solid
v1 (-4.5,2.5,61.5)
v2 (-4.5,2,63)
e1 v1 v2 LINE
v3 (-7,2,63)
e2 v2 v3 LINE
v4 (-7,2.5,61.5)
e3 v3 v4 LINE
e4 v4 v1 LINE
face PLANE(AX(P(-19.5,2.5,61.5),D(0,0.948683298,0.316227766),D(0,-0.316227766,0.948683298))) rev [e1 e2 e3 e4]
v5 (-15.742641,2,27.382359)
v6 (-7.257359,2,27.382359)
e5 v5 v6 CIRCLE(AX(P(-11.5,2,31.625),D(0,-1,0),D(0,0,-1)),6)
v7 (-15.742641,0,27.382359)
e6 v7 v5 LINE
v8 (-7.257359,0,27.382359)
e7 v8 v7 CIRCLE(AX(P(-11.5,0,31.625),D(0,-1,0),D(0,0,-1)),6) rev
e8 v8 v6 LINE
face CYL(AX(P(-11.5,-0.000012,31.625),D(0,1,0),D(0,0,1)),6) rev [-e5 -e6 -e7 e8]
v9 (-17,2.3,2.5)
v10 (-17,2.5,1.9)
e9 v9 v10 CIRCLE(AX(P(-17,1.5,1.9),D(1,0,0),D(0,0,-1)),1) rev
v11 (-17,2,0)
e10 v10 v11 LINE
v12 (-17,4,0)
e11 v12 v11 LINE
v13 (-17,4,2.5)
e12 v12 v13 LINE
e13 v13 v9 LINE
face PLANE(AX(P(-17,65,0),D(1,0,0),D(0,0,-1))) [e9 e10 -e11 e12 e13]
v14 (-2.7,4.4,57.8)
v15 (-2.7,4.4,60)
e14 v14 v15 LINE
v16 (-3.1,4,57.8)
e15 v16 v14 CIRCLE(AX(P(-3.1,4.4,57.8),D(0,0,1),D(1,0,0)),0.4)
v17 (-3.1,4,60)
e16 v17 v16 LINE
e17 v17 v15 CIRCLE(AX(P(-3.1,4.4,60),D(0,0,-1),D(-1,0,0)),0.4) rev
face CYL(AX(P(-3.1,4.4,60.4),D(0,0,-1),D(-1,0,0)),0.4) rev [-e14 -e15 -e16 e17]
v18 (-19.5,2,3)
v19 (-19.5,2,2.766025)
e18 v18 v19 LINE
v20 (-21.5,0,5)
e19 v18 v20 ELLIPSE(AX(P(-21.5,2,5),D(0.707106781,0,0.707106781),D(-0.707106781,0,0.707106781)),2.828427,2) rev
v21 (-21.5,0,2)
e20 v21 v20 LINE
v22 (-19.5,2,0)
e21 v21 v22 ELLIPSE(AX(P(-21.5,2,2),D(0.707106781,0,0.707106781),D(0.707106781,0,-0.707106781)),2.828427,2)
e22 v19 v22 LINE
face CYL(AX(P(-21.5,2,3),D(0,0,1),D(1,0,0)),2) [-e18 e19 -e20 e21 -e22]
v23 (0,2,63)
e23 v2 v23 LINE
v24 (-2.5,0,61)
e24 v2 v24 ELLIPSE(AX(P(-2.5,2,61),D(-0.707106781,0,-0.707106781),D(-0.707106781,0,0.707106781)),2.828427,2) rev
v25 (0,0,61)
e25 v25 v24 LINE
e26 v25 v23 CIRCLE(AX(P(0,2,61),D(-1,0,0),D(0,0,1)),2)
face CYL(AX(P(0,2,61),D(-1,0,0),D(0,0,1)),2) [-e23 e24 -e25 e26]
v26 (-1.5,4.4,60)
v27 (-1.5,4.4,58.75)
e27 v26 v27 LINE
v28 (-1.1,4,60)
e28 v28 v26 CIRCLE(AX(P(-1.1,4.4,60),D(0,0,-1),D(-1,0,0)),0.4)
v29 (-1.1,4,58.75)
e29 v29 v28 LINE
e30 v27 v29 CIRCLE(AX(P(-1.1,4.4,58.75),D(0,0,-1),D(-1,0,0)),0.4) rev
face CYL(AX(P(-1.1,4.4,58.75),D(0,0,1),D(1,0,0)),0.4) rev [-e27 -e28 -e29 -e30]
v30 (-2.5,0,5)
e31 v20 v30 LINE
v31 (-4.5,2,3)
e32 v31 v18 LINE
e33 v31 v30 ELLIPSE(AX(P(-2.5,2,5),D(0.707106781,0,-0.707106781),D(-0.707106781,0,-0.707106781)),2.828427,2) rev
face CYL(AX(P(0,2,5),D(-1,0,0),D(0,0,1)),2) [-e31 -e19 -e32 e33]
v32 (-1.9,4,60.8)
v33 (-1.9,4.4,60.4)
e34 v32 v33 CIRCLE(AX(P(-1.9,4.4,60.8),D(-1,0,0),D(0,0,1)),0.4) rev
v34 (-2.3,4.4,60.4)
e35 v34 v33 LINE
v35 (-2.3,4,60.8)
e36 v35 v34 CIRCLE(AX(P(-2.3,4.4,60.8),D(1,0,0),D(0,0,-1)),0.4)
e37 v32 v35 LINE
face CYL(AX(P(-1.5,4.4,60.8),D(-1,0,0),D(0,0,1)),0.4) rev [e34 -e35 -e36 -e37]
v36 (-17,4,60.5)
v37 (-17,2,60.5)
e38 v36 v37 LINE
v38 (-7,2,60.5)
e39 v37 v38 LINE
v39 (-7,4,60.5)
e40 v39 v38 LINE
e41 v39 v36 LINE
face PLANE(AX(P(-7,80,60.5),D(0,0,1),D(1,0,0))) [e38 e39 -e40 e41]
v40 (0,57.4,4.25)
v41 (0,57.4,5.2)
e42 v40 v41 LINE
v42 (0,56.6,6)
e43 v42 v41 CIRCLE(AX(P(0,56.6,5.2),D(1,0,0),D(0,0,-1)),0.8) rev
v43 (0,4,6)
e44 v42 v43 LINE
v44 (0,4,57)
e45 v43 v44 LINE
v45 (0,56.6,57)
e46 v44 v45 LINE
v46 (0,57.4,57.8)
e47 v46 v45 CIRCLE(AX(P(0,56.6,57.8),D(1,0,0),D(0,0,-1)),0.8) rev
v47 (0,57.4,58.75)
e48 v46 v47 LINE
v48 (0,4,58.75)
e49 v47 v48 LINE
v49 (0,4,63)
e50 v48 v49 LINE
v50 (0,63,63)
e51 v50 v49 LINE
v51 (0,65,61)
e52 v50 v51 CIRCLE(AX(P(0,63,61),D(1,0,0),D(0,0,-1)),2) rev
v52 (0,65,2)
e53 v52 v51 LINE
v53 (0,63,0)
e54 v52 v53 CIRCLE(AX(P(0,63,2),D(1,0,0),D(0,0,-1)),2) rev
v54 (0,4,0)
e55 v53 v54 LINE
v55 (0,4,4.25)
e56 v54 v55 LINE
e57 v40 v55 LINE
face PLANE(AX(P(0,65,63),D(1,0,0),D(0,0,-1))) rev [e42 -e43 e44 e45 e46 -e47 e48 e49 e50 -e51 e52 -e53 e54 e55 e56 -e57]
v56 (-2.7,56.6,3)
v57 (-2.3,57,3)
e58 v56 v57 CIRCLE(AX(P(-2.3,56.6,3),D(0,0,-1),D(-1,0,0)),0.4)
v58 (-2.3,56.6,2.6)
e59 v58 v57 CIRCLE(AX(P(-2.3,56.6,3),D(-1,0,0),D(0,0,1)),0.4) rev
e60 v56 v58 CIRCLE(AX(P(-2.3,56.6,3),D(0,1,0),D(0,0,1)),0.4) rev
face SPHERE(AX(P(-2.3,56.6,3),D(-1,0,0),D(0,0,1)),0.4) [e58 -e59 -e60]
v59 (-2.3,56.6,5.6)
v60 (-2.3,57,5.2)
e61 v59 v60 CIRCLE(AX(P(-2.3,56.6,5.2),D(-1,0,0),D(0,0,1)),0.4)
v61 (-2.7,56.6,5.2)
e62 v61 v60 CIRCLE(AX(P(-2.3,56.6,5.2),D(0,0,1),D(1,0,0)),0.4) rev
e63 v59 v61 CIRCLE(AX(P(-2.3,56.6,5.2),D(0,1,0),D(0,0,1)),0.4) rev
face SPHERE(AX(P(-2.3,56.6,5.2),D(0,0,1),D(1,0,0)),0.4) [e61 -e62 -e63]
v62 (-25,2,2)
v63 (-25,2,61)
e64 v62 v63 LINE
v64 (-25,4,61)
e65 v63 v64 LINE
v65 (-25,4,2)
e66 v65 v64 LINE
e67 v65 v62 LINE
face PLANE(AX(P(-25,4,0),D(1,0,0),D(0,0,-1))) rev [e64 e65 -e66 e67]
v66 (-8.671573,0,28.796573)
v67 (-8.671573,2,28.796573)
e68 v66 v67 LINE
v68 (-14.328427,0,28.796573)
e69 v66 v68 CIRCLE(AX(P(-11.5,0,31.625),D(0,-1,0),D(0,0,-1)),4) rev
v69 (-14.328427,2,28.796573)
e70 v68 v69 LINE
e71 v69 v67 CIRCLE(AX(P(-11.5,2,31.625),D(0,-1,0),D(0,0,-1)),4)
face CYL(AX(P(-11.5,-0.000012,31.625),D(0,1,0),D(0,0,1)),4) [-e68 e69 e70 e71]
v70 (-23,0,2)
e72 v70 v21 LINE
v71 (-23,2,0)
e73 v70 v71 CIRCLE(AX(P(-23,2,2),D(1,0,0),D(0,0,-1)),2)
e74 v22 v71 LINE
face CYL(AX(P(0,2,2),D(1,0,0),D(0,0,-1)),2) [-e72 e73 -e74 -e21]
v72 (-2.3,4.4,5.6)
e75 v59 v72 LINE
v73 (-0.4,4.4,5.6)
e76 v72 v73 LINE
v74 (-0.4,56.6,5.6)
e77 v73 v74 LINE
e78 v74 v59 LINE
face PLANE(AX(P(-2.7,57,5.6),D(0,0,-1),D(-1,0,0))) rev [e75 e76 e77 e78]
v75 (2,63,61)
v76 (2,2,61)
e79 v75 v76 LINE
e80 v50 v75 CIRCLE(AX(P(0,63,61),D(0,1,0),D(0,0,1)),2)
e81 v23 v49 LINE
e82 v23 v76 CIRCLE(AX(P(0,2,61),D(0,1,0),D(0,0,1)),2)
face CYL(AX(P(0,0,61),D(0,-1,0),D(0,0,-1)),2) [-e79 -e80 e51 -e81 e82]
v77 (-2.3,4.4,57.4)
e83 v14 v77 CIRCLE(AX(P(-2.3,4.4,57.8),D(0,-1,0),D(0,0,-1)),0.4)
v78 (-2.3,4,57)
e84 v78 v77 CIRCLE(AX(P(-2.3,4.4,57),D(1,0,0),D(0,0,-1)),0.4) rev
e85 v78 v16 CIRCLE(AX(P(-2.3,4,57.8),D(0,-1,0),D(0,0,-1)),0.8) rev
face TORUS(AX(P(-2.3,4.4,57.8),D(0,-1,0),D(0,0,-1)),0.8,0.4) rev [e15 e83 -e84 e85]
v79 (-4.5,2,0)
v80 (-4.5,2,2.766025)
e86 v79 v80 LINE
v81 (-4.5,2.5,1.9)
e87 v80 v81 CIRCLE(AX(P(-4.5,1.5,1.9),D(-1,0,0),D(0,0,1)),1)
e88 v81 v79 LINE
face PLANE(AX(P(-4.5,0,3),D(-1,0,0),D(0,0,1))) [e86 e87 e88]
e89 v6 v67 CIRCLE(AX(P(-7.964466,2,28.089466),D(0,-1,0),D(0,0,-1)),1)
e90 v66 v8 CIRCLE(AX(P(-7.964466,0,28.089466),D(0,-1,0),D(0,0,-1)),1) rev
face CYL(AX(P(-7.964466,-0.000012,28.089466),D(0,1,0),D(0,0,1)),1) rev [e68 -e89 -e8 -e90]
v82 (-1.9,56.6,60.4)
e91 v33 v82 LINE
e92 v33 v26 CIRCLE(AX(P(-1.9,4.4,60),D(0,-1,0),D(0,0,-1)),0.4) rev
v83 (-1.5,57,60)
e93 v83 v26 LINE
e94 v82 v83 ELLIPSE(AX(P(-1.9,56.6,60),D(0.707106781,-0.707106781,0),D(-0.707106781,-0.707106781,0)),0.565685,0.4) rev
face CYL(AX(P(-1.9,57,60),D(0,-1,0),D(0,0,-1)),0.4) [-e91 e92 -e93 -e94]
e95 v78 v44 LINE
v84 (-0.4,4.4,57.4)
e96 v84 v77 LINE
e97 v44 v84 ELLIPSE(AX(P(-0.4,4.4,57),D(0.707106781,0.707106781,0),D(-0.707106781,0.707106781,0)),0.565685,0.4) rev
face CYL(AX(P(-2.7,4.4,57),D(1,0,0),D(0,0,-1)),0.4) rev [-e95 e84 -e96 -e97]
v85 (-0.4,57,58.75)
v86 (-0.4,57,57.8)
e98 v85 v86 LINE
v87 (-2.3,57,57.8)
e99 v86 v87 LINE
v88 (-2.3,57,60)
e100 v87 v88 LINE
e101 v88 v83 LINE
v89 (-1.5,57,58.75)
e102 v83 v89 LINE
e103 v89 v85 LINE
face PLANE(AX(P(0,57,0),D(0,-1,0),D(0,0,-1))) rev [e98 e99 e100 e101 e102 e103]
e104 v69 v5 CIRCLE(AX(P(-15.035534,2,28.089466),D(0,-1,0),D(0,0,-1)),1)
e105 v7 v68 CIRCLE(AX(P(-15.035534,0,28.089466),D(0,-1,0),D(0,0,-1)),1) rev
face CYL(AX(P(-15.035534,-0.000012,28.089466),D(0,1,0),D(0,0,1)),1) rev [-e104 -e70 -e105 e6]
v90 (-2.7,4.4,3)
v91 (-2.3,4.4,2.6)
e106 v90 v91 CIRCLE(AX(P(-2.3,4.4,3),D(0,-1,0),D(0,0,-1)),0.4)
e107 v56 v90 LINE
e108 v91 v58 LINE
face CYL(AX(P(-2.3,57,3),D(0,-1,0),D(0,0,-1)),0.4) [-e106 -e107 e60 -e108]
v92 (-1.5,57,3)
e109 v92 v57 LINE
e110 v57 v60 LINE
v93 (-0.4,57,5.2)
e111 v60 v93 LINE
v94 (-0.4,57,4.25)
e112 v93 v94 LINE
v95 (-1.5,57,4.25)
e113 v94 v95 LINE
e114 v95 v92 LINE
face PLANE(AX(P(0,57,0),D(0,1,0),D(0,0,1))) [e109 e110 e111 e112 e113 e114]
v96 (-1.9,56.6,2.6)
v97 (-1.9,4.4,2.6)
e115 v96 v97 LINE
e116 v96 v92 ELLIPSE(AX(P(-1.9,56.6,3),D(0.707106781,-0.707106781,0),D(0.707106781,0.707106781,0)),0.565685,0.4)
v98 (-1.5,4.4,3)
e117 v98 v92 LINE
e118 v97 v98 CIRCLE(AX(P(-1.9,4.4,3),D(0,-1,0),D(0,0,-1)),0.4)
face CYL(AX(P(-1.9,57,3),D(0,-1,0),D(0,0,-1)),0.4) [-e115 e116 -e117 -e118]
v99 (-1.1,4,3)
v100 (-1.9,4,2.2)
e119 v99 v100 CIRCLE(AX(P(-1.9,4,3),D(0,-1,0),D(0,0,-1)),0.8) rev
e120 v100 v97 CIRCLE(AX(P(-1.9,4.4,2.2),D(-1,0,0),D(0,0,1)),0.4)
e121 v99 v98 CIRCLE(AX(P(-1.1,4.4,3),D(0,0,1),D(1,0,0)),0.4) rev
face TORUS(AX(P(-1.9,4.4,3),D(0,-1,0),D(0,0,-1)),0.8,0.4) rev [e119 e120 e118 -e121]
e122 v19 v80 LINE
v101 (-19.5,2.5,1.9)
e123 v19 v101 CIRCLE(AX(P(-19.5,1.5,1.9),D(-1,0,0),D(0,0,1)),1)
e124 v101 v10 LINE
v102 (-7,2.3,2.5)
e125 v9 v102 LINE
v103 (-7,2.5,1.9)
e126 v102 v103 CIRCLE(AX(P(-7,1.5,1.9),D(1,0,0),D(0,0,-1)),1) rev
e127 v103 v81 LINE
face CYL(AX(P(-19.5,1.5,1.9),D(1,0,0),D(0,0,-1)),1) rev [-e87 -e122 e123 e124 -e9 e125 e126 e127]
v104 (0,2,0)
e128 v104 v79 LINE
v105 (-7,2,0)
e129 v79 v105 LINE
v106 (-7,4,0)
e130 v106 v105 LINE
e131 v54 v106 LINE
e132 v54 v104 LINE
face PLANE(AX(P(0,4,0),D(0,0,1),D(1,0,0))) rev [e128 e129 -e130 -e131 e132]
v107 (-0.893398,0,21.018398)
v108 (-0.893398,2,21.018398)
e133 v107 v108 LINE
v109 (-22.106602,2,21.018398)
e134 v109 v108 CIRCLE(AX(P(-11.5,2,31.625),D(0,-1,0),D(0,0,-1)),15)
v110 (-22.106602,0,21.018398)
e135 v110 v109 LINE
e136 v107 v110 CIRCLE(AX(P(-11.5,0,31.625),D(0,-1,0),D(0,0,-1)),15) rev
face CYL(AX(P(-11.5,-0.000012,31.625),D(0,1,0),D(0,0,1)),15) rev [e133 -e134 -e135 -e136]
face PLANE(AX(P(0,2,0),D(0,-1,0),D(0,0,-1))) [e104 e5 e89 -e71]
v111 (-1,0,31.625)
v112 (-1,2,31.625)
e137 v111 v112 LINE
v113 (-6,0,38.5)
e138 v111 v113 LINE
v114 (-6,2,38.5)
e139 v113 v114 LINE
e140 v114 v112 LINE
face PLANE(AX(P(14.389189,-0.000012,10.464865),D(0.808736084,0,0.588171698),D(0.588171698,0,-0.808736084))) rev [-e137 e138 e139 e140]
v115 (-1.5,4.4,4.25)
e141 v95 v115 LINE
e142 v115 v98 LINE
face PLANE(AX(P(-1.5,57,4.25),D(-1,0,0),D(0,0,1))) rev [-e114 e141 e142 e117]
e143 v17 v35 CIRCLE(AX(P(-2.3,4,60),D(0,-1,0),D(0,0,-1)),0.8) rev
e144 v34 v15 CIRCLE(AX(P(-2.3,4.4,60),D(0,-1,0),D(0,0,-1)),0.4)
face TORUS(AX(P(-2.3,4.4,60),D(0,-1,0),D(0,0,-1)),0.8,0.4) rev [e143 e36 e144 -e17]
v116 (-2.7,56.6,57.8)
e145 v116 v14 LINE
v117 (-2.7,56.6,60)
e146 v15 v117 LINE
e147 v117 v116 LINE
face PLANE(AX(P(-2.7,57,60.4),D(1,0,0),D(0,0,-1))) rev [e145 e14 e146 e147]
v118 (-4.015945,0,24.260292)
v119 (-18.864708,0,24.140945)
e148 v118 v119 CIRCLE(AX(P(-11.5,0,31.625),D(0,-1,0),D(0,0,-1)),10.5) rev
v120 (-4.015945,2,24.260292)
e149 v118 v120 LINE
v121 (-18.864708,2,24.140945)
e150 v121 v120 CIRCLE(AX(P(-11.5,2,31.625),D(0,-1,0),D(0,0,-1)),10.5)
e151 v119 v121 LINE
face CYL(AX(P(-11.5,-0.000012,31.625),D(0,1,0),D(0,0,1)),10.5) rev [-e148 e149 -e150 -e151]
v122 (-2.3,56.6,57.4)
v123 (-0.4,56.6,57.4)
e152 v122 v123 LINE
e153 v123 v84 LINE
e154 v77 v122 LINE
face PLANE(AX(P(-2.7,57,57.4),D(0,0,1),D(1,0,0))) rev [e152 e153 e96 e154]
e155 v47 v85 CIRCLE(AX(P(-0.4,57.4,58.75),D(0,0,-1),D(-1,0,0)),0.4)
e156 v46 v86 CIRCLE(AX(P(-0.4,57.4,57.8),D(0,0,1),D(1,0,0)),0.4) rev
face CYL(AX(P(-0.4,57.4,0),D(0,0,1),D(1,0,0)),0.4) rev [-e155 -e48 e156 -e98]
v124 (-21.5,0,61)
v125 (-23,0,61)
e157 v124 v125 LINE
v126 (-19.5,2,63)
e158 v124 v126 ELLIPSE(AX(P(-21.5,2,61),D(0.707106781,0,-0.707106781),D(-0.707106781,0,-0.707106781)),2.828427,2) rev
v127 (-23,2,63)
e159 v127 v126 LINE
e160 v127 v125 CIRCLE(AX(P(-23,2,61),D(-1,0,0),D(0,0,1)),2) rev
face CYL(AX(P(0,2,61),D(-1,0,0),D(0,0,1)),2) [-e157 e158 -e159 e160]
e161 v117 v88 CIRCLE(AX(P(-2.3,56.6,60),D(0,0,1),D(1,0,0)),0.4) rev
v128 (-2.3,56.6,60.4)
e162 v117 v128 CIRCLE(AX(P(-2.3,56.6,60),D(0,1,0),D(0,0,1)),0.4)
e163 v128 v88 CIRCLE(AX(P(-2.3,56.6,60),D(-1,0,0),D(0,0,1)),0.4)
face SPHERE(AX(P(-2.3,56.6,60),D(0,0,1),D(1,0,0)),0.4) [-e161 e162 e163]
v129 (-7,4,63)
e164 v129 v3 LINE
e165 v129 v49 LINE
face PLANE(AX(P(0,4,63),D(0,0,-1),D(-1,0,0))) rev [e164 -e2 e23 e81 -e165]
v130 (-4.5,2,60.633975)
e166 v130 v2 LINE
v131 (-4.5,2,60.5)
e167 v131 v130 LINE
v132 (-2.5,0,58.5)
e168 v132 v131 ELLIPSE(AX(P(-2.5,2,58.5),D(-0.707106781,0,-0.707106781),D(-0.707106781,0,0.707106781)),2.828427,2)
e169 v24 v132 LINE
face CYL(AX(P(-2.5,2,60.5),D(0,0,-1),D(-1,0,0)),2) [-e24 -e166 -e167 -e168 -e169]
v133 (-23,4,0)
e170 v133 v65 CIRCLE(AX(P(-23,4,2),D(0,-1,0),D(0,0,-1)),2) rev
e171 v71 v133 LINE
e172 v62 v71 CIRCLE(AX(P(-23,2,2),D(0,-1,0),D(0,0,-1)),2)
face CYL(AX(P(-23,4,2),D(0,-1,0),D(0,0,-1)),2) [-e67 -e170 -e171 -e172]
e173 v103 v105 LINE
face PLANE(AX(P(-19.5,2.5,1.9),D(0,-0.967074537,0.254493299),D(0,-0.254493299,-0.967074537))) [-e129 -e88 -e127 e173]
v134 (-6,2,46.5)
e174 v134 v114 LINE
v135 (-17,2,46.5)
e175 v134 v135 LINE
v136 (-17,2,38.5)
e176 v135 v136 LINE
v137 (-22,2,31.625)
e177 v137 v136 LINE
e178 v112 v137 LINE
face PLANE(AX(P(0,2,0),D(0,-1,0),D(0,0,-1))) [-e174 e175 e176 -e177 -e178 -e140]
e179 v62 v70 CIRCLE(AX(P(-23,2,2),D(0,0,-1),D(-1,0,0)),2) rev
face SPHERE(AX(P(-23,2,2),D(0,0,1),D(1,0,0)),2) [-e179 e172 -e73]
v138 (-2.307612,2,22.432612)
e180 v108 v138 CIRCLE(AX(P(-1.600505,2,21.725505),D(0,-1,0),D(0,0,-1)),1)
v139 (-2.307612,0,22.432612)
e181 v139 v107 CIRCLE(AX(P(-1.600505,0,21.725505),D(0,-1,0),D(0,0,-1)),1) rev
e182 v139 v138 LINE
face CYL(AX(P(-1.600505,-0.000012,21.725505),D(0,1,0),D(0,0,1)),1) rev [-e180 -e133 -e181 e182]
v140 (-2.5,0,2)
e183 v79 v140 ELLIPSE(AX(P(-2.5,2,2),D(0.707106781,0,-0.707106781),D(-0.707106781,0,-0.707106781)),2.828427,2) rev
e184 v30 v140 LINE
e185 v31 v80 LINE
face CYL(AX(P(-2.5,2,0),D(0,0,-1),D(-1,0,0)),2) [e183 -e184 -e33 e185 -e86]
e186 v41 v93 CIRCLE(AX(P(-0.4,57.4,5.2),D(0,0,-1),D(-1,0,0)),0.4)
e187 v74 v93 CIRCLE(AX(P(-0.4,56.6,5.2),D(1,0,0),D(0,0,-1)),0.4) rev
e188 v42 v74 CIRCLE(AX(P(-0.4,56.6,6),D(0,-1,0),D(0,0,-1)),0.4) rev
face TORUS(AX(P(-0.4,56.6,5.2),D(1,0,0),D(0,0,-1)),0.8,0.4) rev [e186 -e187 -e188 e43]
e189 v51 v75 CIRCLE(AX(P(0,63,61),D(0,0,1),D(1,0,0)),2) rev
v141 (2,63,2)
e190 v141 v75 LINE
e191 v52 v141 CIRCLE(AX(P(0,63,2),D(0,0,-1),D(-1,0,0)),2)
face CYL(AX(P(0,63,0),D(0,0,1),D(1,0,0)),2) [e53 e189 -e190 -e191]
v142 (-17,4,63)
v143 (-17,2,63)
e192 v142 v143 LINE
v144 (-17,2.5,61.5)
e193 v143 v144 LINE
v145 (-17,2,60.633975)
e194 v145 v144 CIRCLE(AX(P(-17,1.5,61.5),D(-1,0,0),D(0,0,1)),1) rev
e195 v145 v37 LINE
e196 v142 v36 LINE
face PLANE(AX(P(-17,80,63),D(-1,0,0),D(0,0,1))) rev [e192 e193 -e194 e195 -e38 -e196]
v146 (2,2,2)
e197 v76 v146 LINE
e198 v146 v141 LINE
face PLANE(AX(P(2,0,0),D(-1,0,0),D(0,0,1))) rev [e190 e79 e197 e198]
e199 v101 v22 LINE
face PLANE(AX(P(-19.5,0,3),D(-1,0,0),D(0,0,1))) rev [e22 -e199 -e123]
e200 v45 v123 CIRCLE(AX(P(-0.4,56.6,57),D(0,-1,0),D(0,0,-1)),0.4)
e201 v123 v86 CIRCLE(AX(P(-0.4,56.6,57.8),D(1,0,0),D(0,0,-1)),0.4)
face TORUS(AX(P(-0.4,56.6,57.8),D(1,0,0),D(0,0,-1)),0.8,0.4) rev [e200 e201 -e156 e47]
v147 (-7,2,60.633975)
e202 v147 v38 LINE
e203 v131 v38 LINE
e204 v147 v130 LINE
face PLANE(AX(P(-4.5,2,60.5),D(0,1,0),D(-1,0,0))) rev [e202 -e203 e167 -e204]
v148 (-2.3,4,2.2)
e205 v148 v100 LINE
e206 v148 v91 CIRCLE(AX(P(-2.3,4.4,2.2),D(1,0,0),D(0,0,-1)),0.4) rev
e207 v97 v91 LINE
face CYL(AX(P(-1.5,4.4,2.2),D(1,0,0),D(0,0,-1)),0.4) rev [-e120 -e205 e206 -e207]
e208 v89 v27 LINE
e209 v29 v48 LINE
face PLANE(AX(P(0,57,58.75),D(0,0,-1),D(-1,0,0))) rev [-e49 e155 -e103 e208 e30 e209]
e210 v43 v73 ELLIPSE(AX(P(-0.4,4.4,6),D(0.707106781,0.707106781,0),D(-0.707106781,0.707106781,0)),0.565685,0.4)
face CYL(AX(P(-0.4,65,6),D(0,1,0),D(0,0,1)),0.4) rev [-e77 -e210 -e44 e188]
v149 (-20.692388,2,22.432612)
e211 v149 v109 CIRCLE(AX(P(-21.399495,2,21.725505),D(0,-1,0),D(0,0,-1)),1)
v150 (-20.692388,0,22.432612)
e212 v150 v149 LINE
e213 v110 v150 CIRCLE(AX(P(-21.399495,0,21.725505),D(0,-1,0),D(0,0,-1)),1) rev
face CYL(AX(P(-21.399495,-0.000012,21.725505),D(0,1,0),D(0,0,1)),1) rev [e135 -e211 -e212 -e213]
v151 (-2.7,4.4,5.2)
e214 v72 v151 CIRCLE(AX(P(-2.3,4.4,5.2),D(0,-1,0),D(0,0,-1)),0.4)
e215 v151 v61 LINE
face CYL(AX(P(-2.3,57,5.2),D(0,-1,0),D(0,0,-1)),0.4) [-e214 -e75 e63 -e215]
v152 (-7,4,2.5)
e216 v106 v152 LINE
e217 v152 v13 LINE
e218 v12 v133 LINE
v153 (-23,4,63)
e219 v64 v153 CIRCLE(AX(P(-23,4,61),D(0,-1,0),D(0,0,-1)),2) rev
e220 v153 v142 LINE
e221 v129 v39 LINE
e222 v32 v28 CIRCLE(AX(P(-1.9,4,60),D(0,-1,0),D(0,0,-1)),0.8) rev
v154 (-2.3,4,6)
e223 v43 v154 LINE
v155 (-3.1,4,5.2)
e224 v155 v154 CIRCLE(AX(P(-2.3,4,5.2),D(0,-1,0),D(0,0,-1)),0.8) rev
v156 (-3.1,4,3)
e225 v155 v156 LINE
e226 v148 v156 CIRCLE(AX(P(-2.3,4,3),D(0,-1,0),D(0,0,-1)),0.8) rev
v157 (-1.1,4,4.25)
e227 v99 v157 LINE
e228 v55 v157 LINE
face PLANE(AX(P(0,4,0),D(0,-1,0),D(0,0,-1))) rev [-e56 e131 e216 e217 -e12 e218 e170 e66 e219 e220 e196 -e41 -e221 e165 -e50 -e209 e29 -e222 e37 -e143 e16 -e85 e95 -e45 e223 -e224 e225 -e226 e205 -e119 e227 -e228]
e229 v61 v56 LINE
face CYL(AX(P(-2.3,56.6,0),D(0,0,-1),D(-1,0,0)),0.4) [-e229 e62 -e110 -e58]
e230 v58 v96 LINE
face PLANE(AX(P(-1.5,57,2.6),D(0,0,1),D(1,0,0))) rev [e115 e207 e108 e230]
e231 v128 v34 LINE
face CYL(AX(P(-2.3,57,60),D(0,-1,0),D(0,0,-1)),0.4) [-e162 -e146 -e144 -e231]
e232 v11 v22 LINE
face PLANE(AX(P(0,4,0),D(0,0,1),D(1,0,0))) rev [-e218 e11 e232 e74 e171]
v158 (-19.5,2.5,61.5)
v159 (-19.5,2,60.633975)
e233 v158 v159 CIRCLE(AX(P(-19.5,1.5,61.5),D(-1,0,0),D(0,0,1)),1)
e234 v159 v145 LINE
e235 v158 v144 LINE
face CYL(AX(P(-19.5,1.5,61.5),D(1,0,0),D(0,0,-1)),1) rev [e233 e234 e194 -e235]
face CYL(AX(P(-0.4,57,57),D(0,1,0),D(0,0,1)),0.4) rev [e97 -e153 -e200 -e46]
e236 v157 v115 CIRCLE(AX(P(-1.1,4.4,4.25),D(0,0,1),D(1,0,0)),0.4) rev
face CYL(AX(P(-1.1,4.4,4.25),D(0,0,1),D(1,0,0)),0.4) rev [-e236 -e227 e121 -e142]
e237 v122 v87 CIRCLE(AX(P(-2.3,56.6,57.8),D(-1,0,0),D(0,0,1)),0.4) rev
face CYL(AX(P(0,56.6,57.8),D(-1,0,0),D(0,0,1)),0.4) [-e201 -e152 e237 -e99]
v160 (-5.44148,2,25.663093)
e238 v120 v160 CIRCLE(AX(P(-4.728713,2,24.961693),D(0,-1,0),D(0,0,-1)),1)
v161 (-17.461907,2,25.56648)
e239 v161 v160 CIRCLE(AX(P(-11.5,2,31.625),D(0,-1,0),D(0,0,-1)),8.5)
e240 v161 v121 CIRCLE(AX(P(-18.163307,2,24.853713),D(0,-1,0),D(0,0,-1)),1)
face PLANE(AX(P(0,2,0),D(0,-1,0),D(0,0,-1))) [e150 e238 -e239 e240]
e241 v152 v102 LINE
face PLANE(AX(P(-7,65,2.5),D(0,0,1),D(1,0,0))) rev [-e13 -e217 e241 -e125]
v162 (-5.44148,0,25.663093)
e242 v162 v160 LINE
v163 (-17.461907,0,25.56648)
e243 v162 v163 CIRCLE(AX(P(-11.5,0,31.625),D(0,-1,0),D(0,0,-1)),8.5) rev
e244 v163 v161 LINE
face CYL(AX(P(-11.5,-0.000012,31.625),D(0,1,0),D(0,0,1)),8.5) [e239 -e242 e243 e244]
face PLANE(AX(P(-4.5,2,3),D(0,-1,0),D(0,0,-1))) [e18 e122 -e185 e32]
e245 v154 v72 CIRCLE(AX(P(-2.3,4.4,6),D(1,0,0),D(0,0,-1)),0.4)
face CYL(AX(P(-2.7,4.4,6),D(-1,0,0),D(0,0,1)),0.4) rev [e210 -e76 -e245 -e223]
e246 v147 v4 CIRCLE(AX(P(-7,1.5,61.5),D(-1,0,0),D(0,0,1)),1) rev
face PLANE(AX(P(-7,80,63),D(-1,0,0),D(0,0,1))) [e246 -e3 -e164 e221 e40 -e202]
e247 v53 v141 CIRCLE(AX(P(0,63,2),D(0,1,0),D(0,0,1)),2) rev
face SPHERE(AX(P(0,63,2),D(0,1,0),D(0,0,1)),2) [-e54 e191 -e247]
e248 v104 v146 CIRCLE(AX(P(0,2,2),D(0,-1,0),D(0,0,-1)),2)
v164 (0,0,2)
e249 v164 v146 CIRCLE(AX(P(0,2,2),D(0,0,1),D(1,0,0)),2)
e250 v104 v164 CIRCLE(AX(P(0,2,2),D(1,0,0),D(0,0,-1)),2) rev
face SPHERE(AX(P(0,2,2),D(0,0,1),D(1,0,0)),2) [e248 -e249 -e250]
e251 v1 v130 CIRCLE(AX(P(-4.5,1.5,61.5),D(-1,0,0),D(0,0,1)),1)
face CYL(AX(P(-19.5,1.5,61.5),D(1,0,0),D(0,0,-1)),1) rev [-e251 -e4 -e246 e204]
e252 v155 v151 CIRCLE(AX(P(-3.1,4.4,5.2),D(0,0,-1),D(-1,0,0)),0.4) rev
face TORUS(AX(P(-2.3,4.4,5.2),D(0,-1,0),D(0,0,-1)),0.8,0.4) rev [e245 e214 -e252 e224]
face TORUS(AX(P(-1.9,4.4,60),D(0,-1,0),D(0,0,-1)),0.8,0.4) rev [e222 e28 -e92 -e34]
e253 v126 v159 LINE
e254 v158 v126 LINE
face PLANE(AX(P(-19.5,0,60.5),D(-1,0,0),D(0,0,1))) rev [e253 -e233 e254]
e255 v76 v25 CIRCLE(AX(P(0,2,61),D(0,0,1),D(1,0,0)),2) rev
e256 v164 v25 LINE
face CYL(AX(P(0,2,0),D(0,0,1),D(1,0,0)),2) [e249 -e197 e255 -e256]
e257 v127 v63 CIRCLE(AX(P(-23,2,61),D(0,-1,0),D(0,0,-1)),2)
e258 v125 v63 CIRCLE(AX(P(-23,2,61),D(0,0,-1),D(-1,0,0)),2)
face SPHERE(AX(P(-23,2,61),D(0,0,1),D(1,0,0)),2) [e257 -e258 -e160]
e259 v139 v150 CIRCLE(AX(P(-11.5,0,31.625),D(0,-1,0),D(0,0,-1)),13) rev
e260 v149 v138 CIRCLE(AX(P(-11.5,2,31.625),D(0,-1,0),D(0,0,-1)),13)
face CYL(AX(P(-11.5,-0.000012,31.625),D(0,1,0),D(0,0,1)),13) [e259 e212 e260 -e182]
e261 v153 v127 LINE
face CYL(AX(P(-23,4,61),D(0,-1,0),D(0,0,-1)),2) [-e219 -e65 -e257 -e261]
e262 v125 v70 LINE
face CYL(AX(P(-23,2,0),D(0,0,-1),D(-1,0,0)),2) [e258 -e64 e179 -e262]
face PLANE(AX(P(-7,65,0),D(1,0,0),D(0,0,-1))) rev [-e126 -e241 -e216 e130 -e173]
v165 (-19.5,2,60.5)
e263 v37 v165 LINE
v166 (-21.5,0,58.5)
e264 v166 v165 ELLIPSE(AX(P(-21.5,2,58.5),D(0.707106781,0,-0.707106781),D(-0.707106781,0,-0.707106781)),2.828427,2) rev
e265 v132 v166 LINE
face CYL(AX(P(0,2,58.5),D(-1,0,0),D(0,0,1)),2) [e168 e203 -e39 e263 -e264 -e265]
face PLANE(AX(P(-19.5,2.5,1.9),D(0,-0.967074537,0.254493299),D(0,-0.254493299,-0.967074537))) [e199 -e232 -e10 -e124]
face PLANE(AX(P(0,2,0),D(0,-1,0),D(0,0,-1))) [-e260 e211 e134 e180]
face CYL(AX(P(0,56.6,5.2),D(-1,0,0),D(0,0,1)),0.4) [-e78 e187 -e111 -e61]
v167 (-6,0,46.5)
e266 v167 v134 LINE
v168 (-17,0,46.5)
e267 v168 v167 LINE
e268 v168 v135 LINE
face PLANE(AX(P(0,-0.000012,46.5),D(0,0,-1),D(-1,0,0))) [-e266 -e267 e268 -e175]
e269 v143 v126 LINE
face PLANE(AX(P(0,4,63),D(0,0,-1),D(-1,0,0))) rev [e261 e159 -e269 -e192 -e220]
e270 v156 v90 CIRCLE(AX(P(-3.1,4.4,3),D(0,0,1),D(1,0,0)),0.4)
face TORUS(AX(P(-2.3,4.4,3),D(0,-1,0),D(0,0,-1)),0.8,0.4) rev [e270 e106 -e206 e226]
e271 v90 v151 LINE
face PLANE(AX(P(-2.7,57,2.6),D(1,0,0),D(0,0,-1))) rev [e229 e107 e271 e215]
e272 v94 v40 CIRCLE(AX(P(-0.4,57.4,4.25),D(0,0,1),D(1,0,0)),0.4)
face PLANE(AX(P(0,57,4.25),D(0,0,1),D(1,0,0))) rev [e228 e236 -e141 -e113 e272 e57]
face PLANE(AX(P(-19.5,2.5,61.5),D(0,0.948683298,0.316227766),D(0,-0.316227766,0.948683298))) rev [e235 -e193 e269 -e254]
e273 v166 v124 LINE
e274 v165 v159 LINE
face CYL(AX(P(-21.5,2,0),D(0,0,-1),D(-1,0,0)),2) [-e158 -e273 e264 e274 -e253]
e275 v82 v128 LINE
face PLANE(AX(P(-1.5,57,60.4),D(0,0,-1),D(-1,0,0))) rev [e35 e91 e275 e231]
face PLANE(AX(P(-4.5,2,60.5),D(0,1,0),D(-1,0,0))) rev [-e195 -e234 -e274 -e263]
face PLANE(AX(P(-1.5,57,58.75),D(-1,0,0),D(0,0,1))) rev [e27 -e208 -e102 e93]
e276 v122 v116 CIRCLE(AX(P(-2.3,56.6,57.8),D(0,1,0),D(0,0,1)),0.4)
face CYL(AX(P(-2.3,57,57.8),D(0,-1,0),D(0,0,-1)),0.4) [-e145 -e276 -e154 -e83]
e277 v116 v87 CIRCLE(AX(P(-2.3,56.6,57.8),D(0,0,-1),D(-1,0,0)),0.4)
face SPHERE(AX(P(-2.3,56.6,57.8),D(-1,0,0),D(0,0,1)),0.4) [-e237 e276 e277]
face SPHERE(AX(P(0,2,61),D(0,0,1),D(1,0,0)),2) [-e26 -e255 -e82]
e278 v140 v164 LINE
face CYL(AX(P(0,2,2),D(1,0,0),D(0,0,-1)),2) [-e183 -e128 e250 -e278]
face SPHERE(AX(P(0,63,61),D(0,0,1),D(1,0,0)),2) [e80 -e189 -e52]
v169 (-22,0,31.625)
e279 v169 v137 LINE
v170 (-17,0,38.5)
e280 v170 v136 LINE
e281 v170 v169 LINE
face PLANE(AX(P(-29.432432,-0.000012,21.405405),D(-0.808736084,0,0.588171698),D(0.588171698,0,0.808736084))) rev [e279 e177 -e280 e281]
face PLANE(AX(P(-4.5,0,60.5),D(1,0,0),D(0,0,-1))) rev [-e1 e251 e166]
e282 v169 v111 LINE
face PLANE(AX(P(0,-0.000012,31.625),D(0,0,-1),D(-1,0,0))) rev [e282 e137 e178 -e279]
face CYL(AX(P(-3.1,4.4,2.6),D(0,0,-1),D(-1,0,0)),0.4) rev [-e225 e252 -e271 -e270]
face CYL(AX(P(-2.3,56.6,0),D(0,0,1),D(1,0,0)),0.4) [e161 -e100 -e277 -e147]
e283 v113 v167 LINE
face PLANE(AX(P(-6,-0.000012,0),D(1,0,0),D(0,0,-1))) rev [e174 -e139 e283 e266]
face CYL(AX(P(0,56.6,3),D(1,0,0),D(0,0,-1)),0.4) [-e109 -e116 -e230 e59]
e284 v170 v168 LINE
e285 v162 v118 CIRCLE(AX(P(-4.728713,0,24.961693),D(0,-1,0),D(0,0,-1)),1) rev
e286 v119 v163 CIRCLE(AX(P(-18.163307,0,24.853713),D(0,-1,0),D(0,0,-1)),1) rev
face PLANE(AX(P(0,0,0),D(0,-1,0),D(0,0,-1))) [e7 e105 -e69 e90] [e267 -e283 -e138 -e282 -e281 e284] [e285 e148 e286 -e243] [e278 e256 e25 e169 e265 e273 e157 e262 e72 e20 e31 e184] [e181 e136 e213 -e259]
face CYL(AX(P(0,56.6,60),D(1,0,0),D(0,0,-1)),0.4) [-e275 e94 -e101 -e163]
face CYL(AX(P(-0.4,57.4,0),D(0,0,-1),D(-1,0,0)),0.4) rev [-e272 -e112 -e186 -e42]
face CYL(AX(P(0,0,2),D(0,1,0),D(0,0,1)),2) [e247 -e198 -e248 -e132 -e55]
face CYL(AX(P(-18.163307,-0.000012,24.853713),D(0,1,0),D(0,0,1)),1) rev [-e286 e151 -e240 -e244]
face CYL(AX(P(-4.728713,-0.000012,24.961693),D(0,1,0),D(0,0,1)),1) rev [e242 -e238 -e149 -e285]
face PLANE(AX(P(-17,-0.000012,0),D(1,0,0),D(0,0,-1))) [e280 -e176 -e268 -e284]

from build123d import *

# Parameters (mm, degrees)
SKETCH1_W               = 25
SKETCH1_H               = 63
BOSS_EXTRUDE1_DEPTH     = 4
SKETCH3_W               = 63
SKETCH3_H               = 4
BOSS_EXTRUDE2_DEPTH     = 2
SKETCH4_W               = 2
SKETCH4_H               = 63
BOSS_EXTRUDE3_DEPTH     = 61
SKETCH6_W               = 10
SKETCH6_H               = 2.5
CUT_EXTRUDE1_DEPTH      = 94.909530933
SKETCH6_3_W             = 10
SKETCH6_3_H             = 2.5
CUT_EXTRUDE2_DEPTH      = 80
SKETCH8_W               = 15
SKETCH8_H               = 2
CUT_EXTRUDE3_DEPTH      = 2.5
CUT_EXTRUDE5_DEPTH      = 15
SKETCH11_W              = 15
SKETCH11_H              = 2
CUT_EXTRUDE6_DEPTH      = 3
CUT_EXTRUDE7_DEPTH      = 15
FILLET6_R               = 2
FILLET7_R               = 2
BOSS_EXTRUDE4_DEPTH     = 53
FILLET8_R               = 0.4
FILLET9_R               = 2
CUT_EXTRUDE8_DEPTH      = 94.909530933
CUT_EXTRUDE8_DEPTH_BACK = 2
SKETCH15_W              = 11
SKETCH15_H              = 8


# Some blends are built 0.0001 mm under size
with BuildPart() as part:
    # Sketch1 → Boss-Extrude1 (new body)
    with BuildSketch(Plane(origin=(0, 0, 0), x_dir=(1, 0, 0), z_dir=(0, 1, 0))):
        with Locations((-12.5, -31.5)):
            Rectangle(SKETCH1_W, SKETCH1_H)
    extrude(amount=BOSS_EXTRUDE1_DEPTH)

    # Sketch3 → Boss-Extrude2 (add)
    with BuildSketch(Plane(origin=(0, 0, 0), x_dir=(0, 0, -1), z_dir=(1, 0, 0))):
        with Locations((-31.5, 2)):
            Rectangle(SKETCH3_W, SKETCH3_H)
    extrude(amount=BOSS_EXTRUDE2_DEPTH)

    # Sketch4 → Boss-Extrude3 (add)
    with BuildSketch(Plane(origin=(0, 4, 0), x_dir=(1, 0, 0), z_dir=(0, 1, 0))):
        with Locations((1, -31.5)):
            Rectangle(SKETCH4_W, SKETCH4_H)
    extrude(amount=BOSS_EXTRUDE3_DEPTH)

    # Sketch6 → Cut-Extrude1 (cut, through all)
    with BuildSketch(Plane.XZ):
        with Locations((-12, 1.25)):
            Rectangle(SKETCH6_W, SKETCH6_H)
    extrude(amount=-CUT_EXTRUDE1_DEPTH, mode=Mode.SUBTRACT)

    # Sketch6<3> → Cut-Extrude2 (cut)
    with BuildSketch(Plane.XZ):
        with Locations((-12, 61.75)):
            Rectangle(SKETCH6_3_W, SKETCH6_3_H)
    extrude(amount=-CUT_EXTRUDE2_DEPTH, mode=Mode.SUBTRACT)

    # Sketch8 → Cut-Extrude3 (cut)
    with BuildSketch(Plane.XY.offset(63)):
        with Locations((-12, 1)):
            Rectangle(SKETCH8_W, SKETCH8_H)
    extrude(amount=-CUT_EXTRUDE3_DEPTH, mode=Mode.SUBTRACT)

    # Sketch9 → Cut-Extrude5 (cut)
    with BuildSketch(Plane.ZY.offset(4.5)):
        with BuildLine():
            ThreePointArc((61.5, 2.5), (61, 2.366025404), (60.633974596, 2))
            Line((60.633974596, 2), (63, 2))
            Line((63, 2), (61.5, 2.5))
        make_face()
    extrude(amount=CUT_EXTRUDE5_DEPTH, mode=Mode.SUBTRACT)

    # Sketch11 → Cut-Extrude6 (cut)
    with BuildSketch(Plane(origin=(0, 0, 0), x_dir=(-1, 0, 0), z_dir=(0, 0, -1))):
        with Locations((12, 1)):
            Rectangle(SKETCH11_W, SKETCH11_H)
    extrude(amount=-CUT_EXTRUDE6_DEPTH, mode=Mode.SUBTRACT)

    # Sketch12 → Cut-Extrude7 (cut)
    with BuildSketch(Plane.ZY.offset(4.5)):
        with BuildLine():
            ThreePointArc((2.766025404, 2), (2.4, 2.366025404), (1.9, 2.5))
            Line((1.9, 2.5), (0, 2))
            Line((0, 2), (2.766025404, 2))
        make_face()
    extrude(amount=CUT_EXTRUDE7_DEPTH, mode=Mode.SUBTRACT)

    # Fillet6
    fillet6_edges = [part.edges().sort_by_distance(p)[0] for p in [
        (-19.5, 0, 1.5),
        (-22.25, 0, 0),
        (-25, 0, 31.5),
        (-22.25, 0, 63),
        (-19.5, 0, 61.75),
        (-12, 0, 60.5),
        (-4.5, 0, 61.75),
        (-1.25, 0, 63),
        (2, 0, 31.5),
        (-1.25, 0, 0),
        (-4.5, 0, 1.5),
        (-12, 0, 3),
    ]]
    fillet(fillet6_edges, radius=FILLET6_R - 0.0001)  # a hair under: the kernel refuses the full size

    # Fillet7
    # the kernel refuses this fillet: 2 mm, written as the material it takes off along each edge
    with BuildSketch(Plane(origin=(-23, 0, 61), x_dir=(0, 0, 1), z_dir=(1, 0, 0))) as fillet7_piece_1:
        with BuildLine():
            CenterArc((0.0001, -1.9999), 1.9999, 0, 90)
            Line((2, -1.9999), (2, 0))
            Line((2, 0), (0.0001, 0))
        make_face()
    revolve(axis=Axis((-23, 0, 61), (0, -1, 0)), revolution_arc=90, mode=Mode.SUBTRACT)
    with BuildSketch(Plane(origin=(-23, 0, 2), x_dir=(-1, 0, 0), z_dir=(0, 0, 1))) as fillet7_piece_2:
        with BuildLine():
            CenterArc((0.0001, -1.9999), 1.9999, 0, 90)
            Line((2, -1.9999), (2, 0))
            Line((2, 0), (0.0001, 0))
        make_face()
    revolve(axis=Axis((-23, 0, 2), (0, -1, 0)), revolution_arc=90, mode=Mode.SUBTRACT)
    with BuildSketch(Plane(origin=(-25, 0, 63), x_dir=(0, 0, -1), z_dir=(0, 1, 0)), Plane(origin=(-25, 0, 0), x_dir=(1, 0, 0), z_dir=(0, 1, 0))) as fillet7_piece_3:
        with BuildLine():
            CenterArc((FILLET7_R, -FILLET7_R), FILLET7_R, 90, 90)
            Line((0, -FILLET7_R), (0, 0))
            Line((0, 0), (FILLET7_R, 0))
        make_face()
    extrude(amount=9, mode=Mode.SUBTRACT)

    # Sketch13 → Boss-Extrude4 (add)
    with BuildSketch(Plane(origin=(0, 4, 0), x_dir=(1, 0, 0), z_dir=(0, 1, 0))):
        Polygon((0, -4.25), (-1.5, -4.25), (-1.5, -2.6), (-2.7, -2.6), (-2.7, -5.6), (0, -5.6), align=None)
        Polygon((-1.5, -60.4), (-2.7, -60.4), (-2.7, -57.4), (0, -57.4), (0, -58.75), (-1.5, -58.75), align=None)
    extrude(amount=BOSS_EXTRUDE4_DEPTH)

    # Fillet8
    fillet8_edges = [part.edges().sort_by_distance(p)[0] for p in [
        (0, 30.5, 5.6),
        (-1.5, 4, 3.425),
        (-2.1, 4, 2.6),
        (-1.5, 30.5, 2.6),
        (-2.7, 4, 4.1),
        (-2.7, 30.5, 2.6),
        (-1.35, 4, 5.6),
        (-2.7, 30.5, 5.6),
        (0, 57, 4.925),
        (-2.1, 57, 2.6),
        (-2.7, 57, 4.1),
        (-1.35, 57, 5.6),
        (-1.5, 4, 59.575),
        (-1.5, 30.5, 60.4),
        (-1.35, 4, 57.4),
        (0, 30.5, 57.4),
        (-2.7, 4, 58.9),
        (-2.7, 30.5, 57.4),
        (-2.1, 4, 60.4),
        (-2.7, 30.5, 60.4),
        (0, 57, 58.075),
        (-1.35, 57, 57.4),
        (-2.7, 57, 58.9),
        (-2.1, 57, 60.4),
    ]]
    fillet(fillet8_edges, radius=FILLET8_R)

    # Fillet9
    # the kernel refuses this fillet: 2 mm, written as the material it takes off along each edge
    with BuildSketch(Plane(origin=(0, 0, 61), x_dir=(1, 0, 0), z_dir=(0, 0, -1))) as fillet9_piece_1:
        with BuildLine():
            CenterArc((0.0001, -1.9999), 1.9999, 0, 90)
            Line((2, -1.9999), (2, 0))
            Line((2, 0), (0.0001, 0))
        make_face()
    revolve(axis=Axis((0, 0, 61), (0, -1, 0)), revolution_arc=90, mode=Mode.SUBTRACT)
    with BuildSketch(Plane(origin=(0, 0, 2), x_dir=(0, 0, -1), z_dir=(-1, 0, 0))) as fillet9_piece_2:
        with BuildLine():
            CenterArc((0.0001, -1.9999), 1.9999, 0, 90)
            Line((2, -1.9999), (2, 0))
            Line((2, 0), (0.0001, 0))
        make_face()
    revolve(axis=Axis((0, 0, 2), (0, -1, 0)), revolution_arc=90, mode=Mode.SUBTRACT)
    with BuildSketch(Plane(origin=(0, 63, 61), x_dir=(0, 0, 1), z_dir=(1, 0, 0))) as fillet9_piece_3_section:
        Polygon((0, 0), (FILLET9_R, 0), (FILLET9_R, -FILLET9_R), (0, -FILLET9_R), align=None)
    fillet9_piece_3 = extrude(amount=FILLET9_R, mode=Mode.PRIVATE)
    fillet9_piece_3 = fillet9_piece_3 - Plane(origin=(0, 63, 61), x_dir=(0, -0.7071067811865475, -0.7071067811865475), z_dir=(1, 0, 0)) * Sphere(FILLET9_R, mode=Mode.PRIVATE)
    add(fillet9_piece_3, mode=Mode.SUBTRACT)
    with BuildSketch(Plane(origin=(0, 63, 2), x_dir=(0, 0, -1), z_dir=(0, 1, 0))) as fillet9_piece_4_section:
        Polygon((0, 0), (FILLET9_R, 0), (FILLET9_R, -FILLET9_R), (0, -FILLET9_R), align=None)
    fillet9_piece_4 = extrude(amount=FILLET9_R, mode=Mode.PRIVATE)
    fillet9_piece_4 = fillet9_piece_4 - Plane(origin=(0, 63, 2), x_dir=(-0.7071067811865474, 0, 0.7071067811865476), z_dir=(0, 1, 0)) * Sphere(FILLET9_R, mode=Mode.PRIVATE)
    add(fillet9_piece_4, mode=Mode.SUBTRACT)
    with BuildSketch(Plane(origin=(2, 63, 63), x_dir=(-1, 0, 0), z_dir=(0, -1, 0)), Plane(origin=(2, 63, 0), x_dir=(0, 0, 1), z_dir=(0, -1, 0))) as fillet9_piece_5:
        with BuildLine():
            CenterArc((FILLET9_R, FILLET9_R), FILLET9_R, 180, 90)
            Line((0, FILLET9_R), (0, 0))
            Line((0, 0), (FILLET9_R, 0))
        make_face()
    extrude(amount=63, mode=Mode.SUBTRACT)
    with BuildSketch(Plane(origin=(2, 65, 2), x_dir=(-1, 0, 0), z_dir=(0, 0, 1))) as fillet9_piece_6:
        with BuildLine():
            CenterArc((FILLET9_R, FILLET9_R), FILLET9_R, 180, 90)
            Line((0, FILLET9_R), (0, 0))
            Line((0, 0), (FILLET9_R, 0))
        make_face()
    extrude(amount=59, mode=Mode.SUBTRACT)
    with BuildSketch(Plane(origin=(-5, 65, 0), x_dir=(0, 0, 1), z_dir=(1, 0, 0))) as fillet9_piece_7:
        with BuildLine():
            CenterArc((FILLET9_R, FILLET9_R), FILLET9_R, 180, 90)
            Line((0, FILLET9_R), (0, 0))
            Line((0, 0), (FILLET9_R, 0))
        make_face()
    extrude(amount=5, mode=Mode.SUBTRACT)
    with BuildSketch(Plane(origin=(0, 65, 63), x_dir=(0, -1, 0), z_dir=(-1, 0, 0))) as fillet9_piece_8:
        with BuildLine():
            CenterArc((FILLET9_R, -FILLET9_R), FILLET9_R, 90, 90)
            Line((0, -FILLET9_R), (0, 0))
            Line((0, 0), (FILLET9_R, 0))
        make_face()
    extrude(amount=5, mode=Mode.SUBTRACT)

    # Sketch15 → Cut-Extrude8 (cut, two sides: drawn at the far end of the back side and taken through both)
    with BuildSketch(Plane(origin=(0, 0, 0), x_dir=(-1, 0, 0), z_dir=(0, -1, 0)).offset(-CUT_EXTRUDE8_DEPTH_BACK)):
        with Locations((11.5, -42.5)):
            Rectangle(SKETCH15_W, SKETCH15_H)
        Polygon((22, -31.625), (17, -38.5), (6, -38.5), (1, -31.625), align=None)
        with BuildLine():
            ThreePointArc((15.742640687, -27.382359313), (11.5, -25.625), (7.257359313, -27.382359313))
            ThreePointArc((7.257359313, -27.382359313), (7.257359313, -28.796572875), (8.671572875, -28.796572875))
            ThreePointArc((8.671572875, -28.796572875), (11.5, -27.625), (14.328427125, -28.796572875))
            ThreePointArc((14.328427125, -28.796572875), (15.742640687, -28.796572875), (15.742640687, -27.382359313))
        make_face()
        with BuildLine():
            ThreePointArc((18.864708263, -24.14094547), (11.415609445, -21.125339137), (4.01594547, -24.260291737))
            ThreePointArc((4.01594547, -24.260291737), (4.027311781, -25.674459622), (5.441479666, -25.663093311))
            ThreePointArc((5.441479666, -25.663093311), (11.431683837, -23.12527454), (17.461906689, -25.566479666))
            ThreePointArc((17.461906689, -25.566479666), (18.876074574, -25.555113355), (18.864708263, -24.14094547))
        make_face()
        with BuildLine():
            ThreePointArc((22.106601718, -21.018398282), (11.5, -16.625), (0.893398282, -21.018398282))
            ThreePointArc((0.893398282, -21.018398282), (0.893398282, -22.432611845), (2.307611845, -22.432611845))
            ThreePointArc((2.307611845, -22.432611845), (11.5, -18.625), (20.692388155, -22.432611845))
            ThreePointArc((20.692388155, -22.432611845), (22.106601718, -22.432611845), (22.106601718, -21.018398282))
        make_face()
    extrude(amount=CUT_EXTRUDE8_DEPTH + CUT_EXTRUDE8_DEPTH_BACK, mode=Mode.SUBTRACT)


solid = part.part
